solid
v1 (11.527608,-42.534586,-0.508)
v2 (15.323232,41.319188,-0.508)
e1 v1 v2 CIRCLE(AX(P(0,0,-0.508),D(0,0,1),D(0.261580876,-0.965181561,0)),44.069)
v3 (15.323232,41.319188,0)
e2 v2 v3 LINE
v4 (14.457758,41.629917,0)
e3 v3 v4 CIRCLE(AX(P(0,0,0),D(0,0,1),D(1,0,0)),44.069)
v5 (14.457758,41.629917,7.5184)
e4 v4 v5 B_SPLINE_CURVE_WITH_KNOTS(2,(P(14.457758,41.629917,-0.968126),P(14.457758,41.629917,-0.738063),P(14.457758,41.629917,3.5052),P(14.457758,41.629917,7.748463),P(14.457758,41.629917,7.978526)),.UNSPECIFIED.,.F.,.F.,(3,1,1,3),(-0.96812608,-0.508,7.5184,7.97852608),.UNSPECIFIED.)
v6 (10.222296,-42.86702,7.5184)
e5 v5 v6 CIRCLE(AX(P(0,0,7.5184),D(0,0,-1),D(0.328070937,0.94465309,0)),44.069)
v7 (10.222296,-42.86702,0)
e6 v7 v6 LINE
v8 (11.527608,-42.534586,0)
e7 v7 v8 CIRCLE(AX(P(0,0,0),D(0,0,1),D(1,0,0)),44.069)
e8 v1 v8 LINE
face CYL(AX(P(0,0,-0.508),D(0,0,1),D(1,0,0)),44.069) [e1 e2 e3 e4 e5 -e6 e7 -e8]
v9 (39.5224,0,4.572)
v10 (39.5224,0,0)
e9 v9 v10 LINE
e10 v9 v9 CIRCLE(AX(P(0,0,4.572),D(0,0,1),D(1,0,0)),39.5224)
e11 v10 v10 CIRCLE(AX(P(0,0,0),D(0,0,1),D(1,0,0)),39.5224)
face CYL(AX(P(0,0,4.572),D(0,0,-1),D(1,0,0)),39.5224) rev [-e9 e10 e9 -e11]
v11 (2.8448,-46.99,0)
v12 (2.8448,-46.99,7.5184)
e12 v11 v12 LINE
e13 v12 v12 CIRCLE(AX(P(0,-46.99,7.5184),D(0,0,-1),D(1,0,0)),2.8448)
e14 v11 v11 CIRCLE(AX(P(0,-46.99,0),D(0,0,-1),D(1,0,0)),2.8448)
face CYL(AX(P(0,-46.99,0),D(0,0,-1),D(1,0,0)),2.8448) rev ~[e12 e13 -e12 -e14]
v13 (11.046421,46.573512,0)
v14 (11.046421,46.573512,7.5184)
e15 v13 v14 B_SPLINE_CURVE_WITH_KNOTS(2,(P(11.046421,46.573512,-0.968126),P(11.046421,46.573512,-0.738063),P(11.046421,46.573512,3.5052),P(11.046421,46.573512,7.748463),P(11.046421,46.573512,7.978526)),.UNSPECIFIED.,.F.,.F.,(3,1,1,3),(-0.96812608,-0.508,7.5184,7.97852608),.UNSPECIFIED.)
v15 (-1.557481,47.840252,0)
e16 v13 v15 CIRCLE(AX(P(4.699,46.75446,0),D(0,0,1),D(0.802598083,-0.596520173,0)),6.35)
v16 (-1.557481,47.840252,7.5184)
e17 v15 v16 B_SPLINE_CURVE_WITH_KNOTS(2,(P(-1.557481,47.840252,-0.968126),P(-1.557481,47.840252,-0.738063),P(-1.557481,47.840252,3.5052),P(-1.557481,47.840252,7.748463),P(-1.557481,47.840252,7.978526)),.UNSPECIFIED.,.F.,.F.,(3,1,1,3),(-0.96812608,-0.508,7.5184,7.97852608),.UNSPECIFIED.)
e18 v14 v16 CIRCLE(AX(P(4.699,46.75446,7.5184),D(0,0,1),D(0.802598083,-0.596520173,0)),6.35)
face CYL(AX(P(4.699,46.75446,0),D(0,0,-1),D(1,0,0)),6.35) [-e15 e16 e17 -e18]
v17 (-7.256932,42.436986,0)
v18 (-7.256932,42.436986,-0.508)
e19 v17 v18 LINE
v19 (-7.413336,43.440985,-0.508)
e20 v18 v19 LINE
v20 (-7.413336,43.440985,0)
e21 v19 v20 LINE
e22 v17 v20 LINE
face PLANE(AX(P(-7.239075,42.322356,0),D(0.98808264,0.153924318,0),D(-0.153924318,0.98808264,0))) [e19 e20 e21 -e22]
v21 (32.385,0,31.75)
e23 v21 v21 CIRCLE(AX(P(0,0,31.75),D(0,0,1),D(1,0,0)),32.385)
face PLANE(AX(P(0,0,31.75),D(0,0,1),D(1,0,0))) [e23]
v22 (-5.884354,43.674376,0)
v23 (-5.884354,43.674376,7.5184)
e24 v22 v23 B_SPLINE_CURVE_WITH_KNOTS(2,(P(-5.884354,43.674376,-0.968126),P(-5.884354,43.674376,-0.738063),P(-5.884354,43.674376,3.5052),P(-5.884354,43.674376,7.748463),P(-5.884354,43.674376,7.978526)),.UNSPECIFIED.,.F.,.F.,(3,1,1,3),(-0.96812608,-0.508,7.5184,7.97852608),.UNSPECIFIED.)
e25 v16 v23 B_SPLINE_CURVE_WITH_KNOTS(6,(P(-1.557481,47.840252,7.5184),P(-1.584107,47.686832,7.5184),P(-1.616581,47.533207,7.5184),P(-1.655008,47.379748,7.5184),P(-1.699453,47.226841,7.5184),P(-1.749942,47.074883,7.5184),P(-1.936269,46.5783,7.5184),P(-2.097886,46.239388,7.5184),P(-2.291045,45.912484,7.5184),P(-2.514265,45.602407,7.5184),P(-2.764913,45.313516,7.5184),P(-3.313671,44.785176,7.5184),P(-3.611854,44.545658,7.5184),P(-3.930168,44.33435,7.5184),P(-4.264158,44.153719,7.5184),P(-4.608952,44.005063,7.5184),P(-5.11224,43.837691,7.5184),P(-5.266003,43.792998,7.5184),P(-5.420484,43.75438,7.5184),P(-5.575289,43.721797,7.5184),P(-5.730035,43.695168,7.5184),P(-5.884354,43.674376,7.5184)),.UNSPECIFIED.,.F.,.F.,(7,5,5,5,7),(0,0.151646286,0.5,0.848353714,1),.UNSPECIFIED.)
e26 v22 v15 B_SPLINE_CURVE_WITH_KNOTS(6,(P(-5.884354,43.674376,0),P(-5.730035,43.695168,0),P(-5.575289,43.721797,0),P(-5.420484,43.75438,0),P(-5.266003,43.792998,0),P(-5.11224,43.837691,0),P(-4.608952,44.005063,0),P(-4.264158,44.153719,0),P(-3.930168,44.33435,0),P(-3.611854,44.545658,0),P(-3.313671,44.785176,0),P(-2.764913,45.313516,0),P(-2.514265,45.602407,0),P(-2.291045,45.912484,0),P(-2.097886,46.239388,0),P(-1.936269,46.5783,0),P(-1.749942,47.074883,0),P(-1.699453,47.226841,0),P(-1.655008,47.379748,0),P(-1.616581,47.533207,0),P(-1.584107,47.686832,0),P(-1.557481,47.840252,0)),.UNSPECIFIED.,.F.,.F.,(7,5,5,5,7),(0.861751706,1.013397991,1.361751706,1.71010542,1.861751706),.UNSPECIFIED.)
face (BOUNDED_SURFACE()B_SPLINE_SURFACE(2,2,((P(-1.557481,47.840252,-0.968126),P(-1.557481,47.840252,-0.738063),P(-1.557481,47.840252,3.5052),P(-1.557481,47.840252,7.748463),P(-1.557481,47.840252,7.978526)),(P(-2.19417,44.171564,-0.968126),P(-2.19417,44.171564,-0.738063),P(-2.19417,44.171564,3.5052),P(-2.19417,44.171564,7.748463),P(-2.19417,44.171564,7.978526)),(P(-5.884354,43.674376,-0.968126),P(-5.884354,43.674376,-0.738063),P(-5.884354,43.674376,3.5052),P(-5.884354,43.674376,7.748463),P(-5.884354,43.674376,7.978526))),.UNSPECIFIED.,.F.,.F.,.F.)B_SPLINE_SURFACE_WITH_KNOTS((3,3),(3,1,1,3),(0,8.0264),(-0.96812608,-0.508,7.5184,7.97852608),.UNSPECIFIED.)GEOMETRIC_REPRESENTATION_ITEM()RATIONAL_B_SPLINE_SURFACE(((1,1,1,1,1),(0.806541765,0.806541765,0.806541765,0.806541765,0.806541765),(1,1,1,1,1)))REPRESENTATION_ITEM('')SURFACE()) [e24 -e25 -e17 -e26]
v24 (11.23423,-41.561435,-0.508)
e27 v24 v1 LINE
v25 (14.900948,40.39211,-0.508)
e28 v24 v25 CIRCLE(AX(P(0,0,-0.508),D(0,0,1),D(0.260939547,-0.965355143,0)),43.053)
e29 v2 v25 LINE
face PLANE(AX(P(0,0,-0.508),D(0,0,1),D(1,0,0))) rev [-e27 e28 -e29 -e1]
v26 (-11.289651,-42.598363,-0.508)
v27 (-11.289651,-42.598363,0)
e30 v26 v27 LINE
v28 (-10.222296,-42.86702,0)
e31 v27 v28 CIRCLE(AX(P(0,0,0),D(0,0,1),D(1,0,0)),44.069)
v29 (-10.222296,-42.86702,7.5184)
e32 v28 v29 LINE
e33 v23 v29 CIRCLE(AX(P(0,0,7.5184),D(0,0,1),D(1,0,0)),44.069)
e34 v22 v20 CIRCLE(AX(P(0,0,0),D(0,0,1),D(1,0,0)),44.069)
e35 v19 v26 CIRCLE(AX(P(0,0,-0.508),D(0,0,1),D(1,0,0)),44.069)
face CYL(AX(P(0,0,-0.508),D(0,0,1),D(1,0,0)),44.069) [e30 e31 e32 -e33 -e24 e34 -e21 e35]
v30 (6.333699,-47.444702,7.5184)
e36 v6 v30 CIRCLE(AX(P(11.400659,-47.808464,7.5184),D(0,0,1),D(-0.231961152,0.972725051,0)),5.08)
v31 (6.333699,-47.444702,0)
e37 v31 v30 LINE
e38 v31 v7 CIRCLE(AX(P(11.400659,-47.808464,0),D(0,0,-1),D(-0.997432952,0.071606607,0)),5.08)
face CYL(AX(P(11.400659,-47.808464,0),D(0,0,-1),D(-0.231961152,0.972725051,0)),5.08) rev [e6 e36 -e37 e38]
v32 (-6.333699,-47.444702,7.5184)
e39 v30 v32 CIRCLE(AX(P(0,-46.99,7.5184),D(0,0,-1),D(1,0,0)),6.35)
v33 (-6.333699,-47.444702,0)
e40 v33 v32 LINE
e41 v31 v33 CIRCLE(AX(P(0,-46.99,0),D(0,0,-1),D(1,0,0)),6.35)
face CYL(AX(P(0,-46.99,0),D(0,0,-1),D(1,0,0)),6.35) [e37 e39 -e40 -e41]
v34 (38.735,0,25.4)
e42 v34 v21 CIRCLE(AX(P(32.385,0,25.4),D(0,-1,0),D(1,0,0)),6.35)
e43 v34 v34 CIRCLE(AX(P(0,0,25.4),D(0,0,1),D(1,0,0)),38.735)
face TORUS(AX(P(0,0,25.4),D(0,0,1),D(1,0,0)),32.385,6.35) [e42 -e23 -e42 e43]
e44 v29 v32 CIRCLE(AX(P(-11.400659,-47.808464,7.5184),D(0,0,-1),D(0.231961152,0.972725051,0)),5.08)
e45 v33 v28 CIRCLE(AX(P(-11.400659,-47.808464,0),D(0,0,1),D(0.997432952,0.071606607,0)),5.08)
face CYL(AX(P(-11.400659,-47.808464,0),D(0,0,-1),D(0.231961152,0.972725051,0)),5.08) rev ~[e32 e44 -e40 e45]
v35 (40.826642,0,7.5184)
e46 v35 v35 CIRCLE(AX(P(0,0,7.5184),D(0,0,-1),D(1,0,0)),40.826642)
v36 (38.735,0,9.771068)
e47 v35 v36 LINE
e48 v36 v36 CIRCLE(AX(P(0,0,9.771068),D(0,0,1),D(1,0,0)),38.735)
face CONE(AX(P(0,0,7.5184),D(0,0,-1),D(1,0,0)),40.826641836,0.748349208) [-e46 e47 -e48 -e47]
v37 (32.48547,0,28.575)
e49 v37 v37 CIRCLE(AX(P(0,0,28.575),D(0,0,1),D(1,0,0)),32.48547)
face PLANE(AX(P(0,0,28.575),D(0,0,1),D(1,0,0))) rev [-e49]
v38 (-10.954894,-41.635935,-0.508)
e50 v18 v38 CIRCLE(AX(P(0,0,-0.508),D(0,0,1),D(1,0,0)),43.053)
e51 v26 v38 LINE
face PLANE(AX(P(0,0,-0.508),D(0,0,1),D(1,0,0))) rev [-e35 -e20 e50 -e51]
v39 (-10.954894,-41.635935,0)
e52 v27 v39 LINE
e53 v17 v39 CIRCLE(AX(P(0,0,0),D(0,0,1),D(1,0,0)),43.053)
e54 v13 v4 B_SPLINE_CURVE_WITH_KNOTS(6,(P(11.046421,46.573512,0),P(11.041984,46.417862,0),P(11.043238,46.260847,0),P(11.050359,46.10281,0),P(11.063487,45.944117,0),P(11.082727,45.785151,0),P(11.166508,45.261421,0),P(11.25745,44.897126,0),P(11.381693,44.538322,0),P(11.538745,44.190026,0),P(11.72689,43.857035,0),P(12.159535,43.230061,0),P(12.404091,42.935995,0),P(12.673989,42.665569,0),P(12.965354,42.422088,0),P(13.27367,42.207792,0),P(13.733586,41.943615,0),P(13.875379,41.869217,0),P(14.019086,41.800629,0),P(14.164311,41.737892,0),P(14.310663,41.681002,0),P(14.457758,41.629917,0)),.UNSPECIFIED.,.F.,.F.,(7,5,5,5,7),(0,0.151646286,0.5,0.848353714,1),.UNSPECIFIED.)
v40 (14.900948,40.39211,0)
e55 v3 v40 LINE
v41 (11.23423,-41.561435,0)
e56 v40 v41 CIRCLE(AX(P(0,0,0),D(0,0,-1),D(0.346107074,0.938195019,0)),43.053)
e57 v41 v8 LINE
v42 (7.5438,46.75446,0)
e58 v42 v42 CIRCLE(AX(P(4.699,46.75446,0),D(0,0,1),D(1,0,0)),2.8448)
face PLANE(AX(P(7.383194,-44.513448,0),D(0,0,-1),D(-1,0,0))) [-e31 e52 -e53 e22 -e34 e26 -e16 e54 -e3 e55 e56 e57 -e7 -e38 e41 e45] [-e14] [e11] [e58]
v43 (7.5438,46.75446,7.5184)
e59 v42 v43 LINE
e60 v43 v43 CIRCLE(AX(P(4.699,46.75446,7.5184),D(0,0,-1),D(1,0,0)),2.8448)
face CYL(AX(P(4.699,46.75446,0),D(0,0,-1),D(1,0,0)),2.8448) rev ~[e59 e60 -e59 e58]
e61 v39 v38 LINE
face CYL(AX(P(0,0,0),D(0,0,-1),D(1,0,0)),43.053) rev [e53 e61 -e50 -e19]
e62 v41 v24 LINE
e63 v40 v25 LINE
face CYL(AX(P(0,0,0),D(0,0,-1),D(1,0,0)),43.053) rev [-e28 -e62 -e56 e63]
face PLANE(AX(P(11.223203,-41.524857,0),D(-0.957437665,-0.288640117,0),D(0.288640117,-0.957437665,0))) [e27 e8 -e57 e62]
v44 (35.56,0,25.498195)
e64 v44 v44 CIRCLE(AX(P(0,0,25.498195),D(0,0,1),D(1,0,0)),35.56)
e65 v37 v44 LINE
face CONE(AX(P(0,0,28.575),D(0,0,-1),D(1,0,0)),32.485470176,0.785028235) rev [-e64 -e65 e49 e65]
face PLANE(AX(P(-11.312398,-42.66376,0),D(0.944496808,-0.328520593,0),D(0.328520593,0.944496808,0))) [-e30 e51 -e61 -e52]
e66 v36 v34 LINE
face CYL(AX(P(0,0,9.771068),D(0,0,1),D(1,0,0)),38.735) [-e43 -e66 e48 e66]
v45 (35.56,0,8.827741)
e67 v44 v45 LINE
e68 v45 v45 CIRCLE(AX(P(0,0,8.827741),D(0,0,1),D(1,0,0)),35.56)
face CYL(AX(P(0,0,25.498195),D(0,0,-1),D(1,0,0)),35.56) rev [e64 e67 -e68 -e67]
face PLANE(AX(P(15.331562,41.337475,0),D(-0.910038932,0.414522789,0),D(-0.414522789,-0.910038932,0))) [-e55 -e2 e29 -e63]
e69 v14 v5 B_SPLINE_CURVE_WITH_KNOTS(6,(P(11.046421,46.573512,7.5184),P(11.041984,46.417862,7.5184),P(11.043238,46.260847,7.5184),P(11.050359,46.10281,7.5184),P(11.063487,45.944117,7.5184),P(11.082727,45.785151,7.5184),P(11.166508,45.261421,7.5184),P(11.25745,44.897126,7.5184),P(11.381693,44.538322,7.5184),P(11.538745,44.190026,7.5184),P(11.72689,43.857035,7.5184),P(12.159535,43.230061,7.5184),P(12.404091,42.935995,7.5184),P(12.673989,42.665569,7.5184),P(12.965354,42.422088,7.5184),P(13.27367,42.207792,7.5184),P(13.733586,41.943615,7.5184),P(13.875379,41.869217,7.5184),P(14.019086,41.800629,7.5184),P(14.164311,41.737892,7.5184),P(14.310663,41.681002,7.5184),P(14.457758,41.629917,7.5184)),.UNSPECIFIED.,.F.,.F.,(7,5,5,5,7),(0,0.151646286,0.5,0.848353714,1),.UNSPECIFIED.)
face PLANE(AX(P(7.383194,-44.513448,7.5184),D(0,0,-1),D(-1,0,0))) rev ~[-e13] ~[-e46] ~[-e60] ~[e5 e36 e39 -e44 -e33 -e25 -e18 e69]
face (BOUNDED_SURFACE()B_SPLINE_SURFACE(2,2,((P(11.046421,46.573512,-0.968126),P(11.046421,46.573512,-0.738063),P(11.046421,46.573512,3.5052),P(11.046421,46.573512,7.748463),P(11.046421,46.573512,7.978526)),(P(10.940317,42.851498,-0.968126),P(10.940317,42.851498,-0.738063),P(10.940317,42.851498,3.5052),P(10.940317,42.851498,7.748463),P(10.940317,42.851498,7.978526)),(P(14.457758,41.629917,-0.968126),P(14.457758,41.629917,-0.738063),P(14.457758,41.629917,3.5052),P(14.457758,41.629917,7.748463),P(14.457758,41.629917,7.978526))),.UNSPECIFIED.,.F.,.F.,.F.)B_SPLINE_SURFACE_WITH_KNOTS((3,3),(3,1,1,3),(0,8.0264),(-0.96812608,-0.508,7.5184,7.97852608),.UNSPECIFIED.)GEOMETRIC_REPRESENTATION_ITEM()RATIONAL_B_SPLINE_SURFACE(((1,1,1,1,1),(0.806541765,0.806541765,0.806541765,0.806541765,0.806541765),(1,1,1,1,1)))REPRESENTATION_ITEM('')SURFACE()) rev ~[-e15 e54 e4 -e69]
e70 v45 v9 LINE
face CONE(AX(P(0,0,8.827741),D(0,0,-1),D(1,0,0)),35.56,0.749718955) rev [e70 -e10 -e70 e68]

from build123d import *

# Parameters (mm, degrees)
F2_R        = 2.8448
F3_DEPTH    = 7.5184
F2_R_2      = 6.35
F4_DEPTH    = 7.5184
F5_R        = 5.08
F6_T1_DEPTH = 7.5184
F9_DEPTH    = 0.508


# Not quite as in the source:
# - a fillet or chamfer that OpenCascade refuses, or shapes differently, is made with other operations: its cross-section is extruded or revolved along the edge and cut away or added
# - two fillets or chamfers of one size are made in one step


with BuildPart() as f1:
    # F0 (on Front) → F1 (revolve)
    with BuildSketch(Plane.XZ):
        with BuildLine():
            Line((32.385, 31.75), (0, 31.75))
            Line((0, 31.75), (0, 28.575))
            Line((0, 28.575), (32.4854701757, 28.575))
            Line((32.4854701757, 28.575), (35.56, 25.49819462))
            Line((35.56, 25.49819462), (35.56, 8.8277412578))
            Line((35.56, 8.8277412578), (39.5224, 4.572))
            Line((39.5224, 4.572), (39.5224, 0))
            Line((39.5224, 0), (43.053, 0))
            Line((43.053, 0), (43.053, -0.508))
            Line((43.053, -0.508), (44.069, -0.508))
            Line((44.069, -0.508), (44.069, 7.5184))
            Line((44.069, 7.5184), (40.8266418362, 7.5184))
            Line((40.8266418362, 7.5184), (38.735, 9.7710676491))
            Line((38.735, 9.7710676491), (38.735, 25.4))
            ThreePointArc((38.735, 25.4), (36.8751280605, 29.8901280605), (32.385, 31.75))
        make_face()
    revolve(axis=Axis((0, 0, 30.1625), (0, 0, 1)))

    # F2 (on face) → F3 (join)
    with BuildSketch(Plane(origin=(0, 0, 0), x_dir=(1, 0, 0), z_dir=(0, 0, -1))):
        with BuildLine():
            ThreePointArc((4.7616218936, 42.7888743243), (5.939646413, 44.7443151405), (6.35, 46.99))
            ThreePointArc((6.35, 46.99), (-2.2456848595, 52.929646413), (-4.7616218936, 42.7888743243))
            ThreePointArc((-4.7616218936, 42.7888743243), (0, 43.053), (4.7616218936, 42.7888743243))
        make_face()
        with Locations((0, 46.99)):
            Circle(F2_R, mode=Mode.SUBTRACT)
    extrude(amount=-F3_DEPTH)

    # F2 (on face) → F4 (join)
    with BuildSketch(Plane(origin=(0, 0, 0), x_dir=(1, 0, 0), z_dir=(0, 0, -1))):
        with Locations((0, 46.99)):
            Circle(F2_R_2)
        with Locations((0, 46.99)):
            Circle(F2_R, mode=Mode.SUBTRACT)
        with Locations((4.699, -46.7544596696)):
            Circle(F2_R_2)
        with Locations((4.699, -46.7544596696)):
            Circle(F2_R, mode=Mode.SUBTRACT)
    extrude(amount=-F4_DEPTH)

    # F5
    f5_edges = [f1.edges().sort_by_distance(p)[0] for p in [
        (9.795498, 42.966557, 3.7592),
        (-1.049351, 44.056505, 3.7592),
    ]]
    fillet(f5_edges, radius=F5_R)

    # F6: fillet of radius 5.08 on 2 edges, made by hand

    # F6_s2 → F6_t1 (join)
    with BuildSketch(Plane.XY):
        with BuildLine():
            ThreePointArc((10.2222959919, -42.8670202563), (7.5289917798, -44.5196041815), (6.3336992457, -47.444701952))
            ThreePointArc((6.3336992457, -47.444701952), (6.1774395627, -45.5197141608), (5.4497416206, -43.7307337838))
            ThreePointArc((5.4497416206, -43.7307337838), (7.8479099763, -43.3645831296), (10.2222959919, -42.8670202563))
        make_face()
        with BuildLine():
            ThreePointArc((-10.2222959919, -42.8670202563), (-7.5289917798, -44.5196041815), (-6.3336992457, -47.444701952))
            ThreePointArc((-6.3336992457, -47.444701952), (-6.1774395627, -45.5197141608), (-5.4497416206, -43.7307337838))
            ThreePointArc((-5.4497416206, -43.7307337838), (-7.8479099763, -43.3645831296), (-10.2222959919, -42.8670202563))
        make_face()
    extrude(amount=F6_T1_DEPTH)

    # F8 (on face) → F9 (cut)
    with BuildSketch(Plane(origin=(0, 0, 0), x_dir=(1, 0, 0), z_dir=(0, 0, -1))):
        with BuildLine():
            Line((11.2232032022, 41.5248573346), (11.5476018718, 42.6009083999))
            ThreePointArc((11.5476018718, 42.6009083999), (0.1217283712, 44.1331880413), (-11.3123981282, 42.6637604833))
            Line((-11.3123981282, 42.6637604833), (-10.9422300011, 41.5995270014))
            ThreePointArc((-10.9422300011, 41.5995270014), (0.145362907, 43.0097069155), (11.2232032022, 41.5248573346))
        make_face()
        with BuildLine():
            Line((-7.2390749119, -42.3223562539), (-7.4246343474, -43.5135134363))
            ThreePointArc((-7.4246343474, -43.5135134363), (4.1004463869, -43.9625847646), (15.3315616772, -41.3374751806))
            Line((15.3315616772, -41.3374751806), (14.8499479477, -40.2801455114))
            ThreePointArc((14.8499479477, -40.2801455114), (3.9400511762, -42.757274104), (-7.2390749119, -42.3223562539))
        make_face()
    extrude(amount=F9_DEPTH, mode=Mode.SUBTRACT)


solid = f1.part
